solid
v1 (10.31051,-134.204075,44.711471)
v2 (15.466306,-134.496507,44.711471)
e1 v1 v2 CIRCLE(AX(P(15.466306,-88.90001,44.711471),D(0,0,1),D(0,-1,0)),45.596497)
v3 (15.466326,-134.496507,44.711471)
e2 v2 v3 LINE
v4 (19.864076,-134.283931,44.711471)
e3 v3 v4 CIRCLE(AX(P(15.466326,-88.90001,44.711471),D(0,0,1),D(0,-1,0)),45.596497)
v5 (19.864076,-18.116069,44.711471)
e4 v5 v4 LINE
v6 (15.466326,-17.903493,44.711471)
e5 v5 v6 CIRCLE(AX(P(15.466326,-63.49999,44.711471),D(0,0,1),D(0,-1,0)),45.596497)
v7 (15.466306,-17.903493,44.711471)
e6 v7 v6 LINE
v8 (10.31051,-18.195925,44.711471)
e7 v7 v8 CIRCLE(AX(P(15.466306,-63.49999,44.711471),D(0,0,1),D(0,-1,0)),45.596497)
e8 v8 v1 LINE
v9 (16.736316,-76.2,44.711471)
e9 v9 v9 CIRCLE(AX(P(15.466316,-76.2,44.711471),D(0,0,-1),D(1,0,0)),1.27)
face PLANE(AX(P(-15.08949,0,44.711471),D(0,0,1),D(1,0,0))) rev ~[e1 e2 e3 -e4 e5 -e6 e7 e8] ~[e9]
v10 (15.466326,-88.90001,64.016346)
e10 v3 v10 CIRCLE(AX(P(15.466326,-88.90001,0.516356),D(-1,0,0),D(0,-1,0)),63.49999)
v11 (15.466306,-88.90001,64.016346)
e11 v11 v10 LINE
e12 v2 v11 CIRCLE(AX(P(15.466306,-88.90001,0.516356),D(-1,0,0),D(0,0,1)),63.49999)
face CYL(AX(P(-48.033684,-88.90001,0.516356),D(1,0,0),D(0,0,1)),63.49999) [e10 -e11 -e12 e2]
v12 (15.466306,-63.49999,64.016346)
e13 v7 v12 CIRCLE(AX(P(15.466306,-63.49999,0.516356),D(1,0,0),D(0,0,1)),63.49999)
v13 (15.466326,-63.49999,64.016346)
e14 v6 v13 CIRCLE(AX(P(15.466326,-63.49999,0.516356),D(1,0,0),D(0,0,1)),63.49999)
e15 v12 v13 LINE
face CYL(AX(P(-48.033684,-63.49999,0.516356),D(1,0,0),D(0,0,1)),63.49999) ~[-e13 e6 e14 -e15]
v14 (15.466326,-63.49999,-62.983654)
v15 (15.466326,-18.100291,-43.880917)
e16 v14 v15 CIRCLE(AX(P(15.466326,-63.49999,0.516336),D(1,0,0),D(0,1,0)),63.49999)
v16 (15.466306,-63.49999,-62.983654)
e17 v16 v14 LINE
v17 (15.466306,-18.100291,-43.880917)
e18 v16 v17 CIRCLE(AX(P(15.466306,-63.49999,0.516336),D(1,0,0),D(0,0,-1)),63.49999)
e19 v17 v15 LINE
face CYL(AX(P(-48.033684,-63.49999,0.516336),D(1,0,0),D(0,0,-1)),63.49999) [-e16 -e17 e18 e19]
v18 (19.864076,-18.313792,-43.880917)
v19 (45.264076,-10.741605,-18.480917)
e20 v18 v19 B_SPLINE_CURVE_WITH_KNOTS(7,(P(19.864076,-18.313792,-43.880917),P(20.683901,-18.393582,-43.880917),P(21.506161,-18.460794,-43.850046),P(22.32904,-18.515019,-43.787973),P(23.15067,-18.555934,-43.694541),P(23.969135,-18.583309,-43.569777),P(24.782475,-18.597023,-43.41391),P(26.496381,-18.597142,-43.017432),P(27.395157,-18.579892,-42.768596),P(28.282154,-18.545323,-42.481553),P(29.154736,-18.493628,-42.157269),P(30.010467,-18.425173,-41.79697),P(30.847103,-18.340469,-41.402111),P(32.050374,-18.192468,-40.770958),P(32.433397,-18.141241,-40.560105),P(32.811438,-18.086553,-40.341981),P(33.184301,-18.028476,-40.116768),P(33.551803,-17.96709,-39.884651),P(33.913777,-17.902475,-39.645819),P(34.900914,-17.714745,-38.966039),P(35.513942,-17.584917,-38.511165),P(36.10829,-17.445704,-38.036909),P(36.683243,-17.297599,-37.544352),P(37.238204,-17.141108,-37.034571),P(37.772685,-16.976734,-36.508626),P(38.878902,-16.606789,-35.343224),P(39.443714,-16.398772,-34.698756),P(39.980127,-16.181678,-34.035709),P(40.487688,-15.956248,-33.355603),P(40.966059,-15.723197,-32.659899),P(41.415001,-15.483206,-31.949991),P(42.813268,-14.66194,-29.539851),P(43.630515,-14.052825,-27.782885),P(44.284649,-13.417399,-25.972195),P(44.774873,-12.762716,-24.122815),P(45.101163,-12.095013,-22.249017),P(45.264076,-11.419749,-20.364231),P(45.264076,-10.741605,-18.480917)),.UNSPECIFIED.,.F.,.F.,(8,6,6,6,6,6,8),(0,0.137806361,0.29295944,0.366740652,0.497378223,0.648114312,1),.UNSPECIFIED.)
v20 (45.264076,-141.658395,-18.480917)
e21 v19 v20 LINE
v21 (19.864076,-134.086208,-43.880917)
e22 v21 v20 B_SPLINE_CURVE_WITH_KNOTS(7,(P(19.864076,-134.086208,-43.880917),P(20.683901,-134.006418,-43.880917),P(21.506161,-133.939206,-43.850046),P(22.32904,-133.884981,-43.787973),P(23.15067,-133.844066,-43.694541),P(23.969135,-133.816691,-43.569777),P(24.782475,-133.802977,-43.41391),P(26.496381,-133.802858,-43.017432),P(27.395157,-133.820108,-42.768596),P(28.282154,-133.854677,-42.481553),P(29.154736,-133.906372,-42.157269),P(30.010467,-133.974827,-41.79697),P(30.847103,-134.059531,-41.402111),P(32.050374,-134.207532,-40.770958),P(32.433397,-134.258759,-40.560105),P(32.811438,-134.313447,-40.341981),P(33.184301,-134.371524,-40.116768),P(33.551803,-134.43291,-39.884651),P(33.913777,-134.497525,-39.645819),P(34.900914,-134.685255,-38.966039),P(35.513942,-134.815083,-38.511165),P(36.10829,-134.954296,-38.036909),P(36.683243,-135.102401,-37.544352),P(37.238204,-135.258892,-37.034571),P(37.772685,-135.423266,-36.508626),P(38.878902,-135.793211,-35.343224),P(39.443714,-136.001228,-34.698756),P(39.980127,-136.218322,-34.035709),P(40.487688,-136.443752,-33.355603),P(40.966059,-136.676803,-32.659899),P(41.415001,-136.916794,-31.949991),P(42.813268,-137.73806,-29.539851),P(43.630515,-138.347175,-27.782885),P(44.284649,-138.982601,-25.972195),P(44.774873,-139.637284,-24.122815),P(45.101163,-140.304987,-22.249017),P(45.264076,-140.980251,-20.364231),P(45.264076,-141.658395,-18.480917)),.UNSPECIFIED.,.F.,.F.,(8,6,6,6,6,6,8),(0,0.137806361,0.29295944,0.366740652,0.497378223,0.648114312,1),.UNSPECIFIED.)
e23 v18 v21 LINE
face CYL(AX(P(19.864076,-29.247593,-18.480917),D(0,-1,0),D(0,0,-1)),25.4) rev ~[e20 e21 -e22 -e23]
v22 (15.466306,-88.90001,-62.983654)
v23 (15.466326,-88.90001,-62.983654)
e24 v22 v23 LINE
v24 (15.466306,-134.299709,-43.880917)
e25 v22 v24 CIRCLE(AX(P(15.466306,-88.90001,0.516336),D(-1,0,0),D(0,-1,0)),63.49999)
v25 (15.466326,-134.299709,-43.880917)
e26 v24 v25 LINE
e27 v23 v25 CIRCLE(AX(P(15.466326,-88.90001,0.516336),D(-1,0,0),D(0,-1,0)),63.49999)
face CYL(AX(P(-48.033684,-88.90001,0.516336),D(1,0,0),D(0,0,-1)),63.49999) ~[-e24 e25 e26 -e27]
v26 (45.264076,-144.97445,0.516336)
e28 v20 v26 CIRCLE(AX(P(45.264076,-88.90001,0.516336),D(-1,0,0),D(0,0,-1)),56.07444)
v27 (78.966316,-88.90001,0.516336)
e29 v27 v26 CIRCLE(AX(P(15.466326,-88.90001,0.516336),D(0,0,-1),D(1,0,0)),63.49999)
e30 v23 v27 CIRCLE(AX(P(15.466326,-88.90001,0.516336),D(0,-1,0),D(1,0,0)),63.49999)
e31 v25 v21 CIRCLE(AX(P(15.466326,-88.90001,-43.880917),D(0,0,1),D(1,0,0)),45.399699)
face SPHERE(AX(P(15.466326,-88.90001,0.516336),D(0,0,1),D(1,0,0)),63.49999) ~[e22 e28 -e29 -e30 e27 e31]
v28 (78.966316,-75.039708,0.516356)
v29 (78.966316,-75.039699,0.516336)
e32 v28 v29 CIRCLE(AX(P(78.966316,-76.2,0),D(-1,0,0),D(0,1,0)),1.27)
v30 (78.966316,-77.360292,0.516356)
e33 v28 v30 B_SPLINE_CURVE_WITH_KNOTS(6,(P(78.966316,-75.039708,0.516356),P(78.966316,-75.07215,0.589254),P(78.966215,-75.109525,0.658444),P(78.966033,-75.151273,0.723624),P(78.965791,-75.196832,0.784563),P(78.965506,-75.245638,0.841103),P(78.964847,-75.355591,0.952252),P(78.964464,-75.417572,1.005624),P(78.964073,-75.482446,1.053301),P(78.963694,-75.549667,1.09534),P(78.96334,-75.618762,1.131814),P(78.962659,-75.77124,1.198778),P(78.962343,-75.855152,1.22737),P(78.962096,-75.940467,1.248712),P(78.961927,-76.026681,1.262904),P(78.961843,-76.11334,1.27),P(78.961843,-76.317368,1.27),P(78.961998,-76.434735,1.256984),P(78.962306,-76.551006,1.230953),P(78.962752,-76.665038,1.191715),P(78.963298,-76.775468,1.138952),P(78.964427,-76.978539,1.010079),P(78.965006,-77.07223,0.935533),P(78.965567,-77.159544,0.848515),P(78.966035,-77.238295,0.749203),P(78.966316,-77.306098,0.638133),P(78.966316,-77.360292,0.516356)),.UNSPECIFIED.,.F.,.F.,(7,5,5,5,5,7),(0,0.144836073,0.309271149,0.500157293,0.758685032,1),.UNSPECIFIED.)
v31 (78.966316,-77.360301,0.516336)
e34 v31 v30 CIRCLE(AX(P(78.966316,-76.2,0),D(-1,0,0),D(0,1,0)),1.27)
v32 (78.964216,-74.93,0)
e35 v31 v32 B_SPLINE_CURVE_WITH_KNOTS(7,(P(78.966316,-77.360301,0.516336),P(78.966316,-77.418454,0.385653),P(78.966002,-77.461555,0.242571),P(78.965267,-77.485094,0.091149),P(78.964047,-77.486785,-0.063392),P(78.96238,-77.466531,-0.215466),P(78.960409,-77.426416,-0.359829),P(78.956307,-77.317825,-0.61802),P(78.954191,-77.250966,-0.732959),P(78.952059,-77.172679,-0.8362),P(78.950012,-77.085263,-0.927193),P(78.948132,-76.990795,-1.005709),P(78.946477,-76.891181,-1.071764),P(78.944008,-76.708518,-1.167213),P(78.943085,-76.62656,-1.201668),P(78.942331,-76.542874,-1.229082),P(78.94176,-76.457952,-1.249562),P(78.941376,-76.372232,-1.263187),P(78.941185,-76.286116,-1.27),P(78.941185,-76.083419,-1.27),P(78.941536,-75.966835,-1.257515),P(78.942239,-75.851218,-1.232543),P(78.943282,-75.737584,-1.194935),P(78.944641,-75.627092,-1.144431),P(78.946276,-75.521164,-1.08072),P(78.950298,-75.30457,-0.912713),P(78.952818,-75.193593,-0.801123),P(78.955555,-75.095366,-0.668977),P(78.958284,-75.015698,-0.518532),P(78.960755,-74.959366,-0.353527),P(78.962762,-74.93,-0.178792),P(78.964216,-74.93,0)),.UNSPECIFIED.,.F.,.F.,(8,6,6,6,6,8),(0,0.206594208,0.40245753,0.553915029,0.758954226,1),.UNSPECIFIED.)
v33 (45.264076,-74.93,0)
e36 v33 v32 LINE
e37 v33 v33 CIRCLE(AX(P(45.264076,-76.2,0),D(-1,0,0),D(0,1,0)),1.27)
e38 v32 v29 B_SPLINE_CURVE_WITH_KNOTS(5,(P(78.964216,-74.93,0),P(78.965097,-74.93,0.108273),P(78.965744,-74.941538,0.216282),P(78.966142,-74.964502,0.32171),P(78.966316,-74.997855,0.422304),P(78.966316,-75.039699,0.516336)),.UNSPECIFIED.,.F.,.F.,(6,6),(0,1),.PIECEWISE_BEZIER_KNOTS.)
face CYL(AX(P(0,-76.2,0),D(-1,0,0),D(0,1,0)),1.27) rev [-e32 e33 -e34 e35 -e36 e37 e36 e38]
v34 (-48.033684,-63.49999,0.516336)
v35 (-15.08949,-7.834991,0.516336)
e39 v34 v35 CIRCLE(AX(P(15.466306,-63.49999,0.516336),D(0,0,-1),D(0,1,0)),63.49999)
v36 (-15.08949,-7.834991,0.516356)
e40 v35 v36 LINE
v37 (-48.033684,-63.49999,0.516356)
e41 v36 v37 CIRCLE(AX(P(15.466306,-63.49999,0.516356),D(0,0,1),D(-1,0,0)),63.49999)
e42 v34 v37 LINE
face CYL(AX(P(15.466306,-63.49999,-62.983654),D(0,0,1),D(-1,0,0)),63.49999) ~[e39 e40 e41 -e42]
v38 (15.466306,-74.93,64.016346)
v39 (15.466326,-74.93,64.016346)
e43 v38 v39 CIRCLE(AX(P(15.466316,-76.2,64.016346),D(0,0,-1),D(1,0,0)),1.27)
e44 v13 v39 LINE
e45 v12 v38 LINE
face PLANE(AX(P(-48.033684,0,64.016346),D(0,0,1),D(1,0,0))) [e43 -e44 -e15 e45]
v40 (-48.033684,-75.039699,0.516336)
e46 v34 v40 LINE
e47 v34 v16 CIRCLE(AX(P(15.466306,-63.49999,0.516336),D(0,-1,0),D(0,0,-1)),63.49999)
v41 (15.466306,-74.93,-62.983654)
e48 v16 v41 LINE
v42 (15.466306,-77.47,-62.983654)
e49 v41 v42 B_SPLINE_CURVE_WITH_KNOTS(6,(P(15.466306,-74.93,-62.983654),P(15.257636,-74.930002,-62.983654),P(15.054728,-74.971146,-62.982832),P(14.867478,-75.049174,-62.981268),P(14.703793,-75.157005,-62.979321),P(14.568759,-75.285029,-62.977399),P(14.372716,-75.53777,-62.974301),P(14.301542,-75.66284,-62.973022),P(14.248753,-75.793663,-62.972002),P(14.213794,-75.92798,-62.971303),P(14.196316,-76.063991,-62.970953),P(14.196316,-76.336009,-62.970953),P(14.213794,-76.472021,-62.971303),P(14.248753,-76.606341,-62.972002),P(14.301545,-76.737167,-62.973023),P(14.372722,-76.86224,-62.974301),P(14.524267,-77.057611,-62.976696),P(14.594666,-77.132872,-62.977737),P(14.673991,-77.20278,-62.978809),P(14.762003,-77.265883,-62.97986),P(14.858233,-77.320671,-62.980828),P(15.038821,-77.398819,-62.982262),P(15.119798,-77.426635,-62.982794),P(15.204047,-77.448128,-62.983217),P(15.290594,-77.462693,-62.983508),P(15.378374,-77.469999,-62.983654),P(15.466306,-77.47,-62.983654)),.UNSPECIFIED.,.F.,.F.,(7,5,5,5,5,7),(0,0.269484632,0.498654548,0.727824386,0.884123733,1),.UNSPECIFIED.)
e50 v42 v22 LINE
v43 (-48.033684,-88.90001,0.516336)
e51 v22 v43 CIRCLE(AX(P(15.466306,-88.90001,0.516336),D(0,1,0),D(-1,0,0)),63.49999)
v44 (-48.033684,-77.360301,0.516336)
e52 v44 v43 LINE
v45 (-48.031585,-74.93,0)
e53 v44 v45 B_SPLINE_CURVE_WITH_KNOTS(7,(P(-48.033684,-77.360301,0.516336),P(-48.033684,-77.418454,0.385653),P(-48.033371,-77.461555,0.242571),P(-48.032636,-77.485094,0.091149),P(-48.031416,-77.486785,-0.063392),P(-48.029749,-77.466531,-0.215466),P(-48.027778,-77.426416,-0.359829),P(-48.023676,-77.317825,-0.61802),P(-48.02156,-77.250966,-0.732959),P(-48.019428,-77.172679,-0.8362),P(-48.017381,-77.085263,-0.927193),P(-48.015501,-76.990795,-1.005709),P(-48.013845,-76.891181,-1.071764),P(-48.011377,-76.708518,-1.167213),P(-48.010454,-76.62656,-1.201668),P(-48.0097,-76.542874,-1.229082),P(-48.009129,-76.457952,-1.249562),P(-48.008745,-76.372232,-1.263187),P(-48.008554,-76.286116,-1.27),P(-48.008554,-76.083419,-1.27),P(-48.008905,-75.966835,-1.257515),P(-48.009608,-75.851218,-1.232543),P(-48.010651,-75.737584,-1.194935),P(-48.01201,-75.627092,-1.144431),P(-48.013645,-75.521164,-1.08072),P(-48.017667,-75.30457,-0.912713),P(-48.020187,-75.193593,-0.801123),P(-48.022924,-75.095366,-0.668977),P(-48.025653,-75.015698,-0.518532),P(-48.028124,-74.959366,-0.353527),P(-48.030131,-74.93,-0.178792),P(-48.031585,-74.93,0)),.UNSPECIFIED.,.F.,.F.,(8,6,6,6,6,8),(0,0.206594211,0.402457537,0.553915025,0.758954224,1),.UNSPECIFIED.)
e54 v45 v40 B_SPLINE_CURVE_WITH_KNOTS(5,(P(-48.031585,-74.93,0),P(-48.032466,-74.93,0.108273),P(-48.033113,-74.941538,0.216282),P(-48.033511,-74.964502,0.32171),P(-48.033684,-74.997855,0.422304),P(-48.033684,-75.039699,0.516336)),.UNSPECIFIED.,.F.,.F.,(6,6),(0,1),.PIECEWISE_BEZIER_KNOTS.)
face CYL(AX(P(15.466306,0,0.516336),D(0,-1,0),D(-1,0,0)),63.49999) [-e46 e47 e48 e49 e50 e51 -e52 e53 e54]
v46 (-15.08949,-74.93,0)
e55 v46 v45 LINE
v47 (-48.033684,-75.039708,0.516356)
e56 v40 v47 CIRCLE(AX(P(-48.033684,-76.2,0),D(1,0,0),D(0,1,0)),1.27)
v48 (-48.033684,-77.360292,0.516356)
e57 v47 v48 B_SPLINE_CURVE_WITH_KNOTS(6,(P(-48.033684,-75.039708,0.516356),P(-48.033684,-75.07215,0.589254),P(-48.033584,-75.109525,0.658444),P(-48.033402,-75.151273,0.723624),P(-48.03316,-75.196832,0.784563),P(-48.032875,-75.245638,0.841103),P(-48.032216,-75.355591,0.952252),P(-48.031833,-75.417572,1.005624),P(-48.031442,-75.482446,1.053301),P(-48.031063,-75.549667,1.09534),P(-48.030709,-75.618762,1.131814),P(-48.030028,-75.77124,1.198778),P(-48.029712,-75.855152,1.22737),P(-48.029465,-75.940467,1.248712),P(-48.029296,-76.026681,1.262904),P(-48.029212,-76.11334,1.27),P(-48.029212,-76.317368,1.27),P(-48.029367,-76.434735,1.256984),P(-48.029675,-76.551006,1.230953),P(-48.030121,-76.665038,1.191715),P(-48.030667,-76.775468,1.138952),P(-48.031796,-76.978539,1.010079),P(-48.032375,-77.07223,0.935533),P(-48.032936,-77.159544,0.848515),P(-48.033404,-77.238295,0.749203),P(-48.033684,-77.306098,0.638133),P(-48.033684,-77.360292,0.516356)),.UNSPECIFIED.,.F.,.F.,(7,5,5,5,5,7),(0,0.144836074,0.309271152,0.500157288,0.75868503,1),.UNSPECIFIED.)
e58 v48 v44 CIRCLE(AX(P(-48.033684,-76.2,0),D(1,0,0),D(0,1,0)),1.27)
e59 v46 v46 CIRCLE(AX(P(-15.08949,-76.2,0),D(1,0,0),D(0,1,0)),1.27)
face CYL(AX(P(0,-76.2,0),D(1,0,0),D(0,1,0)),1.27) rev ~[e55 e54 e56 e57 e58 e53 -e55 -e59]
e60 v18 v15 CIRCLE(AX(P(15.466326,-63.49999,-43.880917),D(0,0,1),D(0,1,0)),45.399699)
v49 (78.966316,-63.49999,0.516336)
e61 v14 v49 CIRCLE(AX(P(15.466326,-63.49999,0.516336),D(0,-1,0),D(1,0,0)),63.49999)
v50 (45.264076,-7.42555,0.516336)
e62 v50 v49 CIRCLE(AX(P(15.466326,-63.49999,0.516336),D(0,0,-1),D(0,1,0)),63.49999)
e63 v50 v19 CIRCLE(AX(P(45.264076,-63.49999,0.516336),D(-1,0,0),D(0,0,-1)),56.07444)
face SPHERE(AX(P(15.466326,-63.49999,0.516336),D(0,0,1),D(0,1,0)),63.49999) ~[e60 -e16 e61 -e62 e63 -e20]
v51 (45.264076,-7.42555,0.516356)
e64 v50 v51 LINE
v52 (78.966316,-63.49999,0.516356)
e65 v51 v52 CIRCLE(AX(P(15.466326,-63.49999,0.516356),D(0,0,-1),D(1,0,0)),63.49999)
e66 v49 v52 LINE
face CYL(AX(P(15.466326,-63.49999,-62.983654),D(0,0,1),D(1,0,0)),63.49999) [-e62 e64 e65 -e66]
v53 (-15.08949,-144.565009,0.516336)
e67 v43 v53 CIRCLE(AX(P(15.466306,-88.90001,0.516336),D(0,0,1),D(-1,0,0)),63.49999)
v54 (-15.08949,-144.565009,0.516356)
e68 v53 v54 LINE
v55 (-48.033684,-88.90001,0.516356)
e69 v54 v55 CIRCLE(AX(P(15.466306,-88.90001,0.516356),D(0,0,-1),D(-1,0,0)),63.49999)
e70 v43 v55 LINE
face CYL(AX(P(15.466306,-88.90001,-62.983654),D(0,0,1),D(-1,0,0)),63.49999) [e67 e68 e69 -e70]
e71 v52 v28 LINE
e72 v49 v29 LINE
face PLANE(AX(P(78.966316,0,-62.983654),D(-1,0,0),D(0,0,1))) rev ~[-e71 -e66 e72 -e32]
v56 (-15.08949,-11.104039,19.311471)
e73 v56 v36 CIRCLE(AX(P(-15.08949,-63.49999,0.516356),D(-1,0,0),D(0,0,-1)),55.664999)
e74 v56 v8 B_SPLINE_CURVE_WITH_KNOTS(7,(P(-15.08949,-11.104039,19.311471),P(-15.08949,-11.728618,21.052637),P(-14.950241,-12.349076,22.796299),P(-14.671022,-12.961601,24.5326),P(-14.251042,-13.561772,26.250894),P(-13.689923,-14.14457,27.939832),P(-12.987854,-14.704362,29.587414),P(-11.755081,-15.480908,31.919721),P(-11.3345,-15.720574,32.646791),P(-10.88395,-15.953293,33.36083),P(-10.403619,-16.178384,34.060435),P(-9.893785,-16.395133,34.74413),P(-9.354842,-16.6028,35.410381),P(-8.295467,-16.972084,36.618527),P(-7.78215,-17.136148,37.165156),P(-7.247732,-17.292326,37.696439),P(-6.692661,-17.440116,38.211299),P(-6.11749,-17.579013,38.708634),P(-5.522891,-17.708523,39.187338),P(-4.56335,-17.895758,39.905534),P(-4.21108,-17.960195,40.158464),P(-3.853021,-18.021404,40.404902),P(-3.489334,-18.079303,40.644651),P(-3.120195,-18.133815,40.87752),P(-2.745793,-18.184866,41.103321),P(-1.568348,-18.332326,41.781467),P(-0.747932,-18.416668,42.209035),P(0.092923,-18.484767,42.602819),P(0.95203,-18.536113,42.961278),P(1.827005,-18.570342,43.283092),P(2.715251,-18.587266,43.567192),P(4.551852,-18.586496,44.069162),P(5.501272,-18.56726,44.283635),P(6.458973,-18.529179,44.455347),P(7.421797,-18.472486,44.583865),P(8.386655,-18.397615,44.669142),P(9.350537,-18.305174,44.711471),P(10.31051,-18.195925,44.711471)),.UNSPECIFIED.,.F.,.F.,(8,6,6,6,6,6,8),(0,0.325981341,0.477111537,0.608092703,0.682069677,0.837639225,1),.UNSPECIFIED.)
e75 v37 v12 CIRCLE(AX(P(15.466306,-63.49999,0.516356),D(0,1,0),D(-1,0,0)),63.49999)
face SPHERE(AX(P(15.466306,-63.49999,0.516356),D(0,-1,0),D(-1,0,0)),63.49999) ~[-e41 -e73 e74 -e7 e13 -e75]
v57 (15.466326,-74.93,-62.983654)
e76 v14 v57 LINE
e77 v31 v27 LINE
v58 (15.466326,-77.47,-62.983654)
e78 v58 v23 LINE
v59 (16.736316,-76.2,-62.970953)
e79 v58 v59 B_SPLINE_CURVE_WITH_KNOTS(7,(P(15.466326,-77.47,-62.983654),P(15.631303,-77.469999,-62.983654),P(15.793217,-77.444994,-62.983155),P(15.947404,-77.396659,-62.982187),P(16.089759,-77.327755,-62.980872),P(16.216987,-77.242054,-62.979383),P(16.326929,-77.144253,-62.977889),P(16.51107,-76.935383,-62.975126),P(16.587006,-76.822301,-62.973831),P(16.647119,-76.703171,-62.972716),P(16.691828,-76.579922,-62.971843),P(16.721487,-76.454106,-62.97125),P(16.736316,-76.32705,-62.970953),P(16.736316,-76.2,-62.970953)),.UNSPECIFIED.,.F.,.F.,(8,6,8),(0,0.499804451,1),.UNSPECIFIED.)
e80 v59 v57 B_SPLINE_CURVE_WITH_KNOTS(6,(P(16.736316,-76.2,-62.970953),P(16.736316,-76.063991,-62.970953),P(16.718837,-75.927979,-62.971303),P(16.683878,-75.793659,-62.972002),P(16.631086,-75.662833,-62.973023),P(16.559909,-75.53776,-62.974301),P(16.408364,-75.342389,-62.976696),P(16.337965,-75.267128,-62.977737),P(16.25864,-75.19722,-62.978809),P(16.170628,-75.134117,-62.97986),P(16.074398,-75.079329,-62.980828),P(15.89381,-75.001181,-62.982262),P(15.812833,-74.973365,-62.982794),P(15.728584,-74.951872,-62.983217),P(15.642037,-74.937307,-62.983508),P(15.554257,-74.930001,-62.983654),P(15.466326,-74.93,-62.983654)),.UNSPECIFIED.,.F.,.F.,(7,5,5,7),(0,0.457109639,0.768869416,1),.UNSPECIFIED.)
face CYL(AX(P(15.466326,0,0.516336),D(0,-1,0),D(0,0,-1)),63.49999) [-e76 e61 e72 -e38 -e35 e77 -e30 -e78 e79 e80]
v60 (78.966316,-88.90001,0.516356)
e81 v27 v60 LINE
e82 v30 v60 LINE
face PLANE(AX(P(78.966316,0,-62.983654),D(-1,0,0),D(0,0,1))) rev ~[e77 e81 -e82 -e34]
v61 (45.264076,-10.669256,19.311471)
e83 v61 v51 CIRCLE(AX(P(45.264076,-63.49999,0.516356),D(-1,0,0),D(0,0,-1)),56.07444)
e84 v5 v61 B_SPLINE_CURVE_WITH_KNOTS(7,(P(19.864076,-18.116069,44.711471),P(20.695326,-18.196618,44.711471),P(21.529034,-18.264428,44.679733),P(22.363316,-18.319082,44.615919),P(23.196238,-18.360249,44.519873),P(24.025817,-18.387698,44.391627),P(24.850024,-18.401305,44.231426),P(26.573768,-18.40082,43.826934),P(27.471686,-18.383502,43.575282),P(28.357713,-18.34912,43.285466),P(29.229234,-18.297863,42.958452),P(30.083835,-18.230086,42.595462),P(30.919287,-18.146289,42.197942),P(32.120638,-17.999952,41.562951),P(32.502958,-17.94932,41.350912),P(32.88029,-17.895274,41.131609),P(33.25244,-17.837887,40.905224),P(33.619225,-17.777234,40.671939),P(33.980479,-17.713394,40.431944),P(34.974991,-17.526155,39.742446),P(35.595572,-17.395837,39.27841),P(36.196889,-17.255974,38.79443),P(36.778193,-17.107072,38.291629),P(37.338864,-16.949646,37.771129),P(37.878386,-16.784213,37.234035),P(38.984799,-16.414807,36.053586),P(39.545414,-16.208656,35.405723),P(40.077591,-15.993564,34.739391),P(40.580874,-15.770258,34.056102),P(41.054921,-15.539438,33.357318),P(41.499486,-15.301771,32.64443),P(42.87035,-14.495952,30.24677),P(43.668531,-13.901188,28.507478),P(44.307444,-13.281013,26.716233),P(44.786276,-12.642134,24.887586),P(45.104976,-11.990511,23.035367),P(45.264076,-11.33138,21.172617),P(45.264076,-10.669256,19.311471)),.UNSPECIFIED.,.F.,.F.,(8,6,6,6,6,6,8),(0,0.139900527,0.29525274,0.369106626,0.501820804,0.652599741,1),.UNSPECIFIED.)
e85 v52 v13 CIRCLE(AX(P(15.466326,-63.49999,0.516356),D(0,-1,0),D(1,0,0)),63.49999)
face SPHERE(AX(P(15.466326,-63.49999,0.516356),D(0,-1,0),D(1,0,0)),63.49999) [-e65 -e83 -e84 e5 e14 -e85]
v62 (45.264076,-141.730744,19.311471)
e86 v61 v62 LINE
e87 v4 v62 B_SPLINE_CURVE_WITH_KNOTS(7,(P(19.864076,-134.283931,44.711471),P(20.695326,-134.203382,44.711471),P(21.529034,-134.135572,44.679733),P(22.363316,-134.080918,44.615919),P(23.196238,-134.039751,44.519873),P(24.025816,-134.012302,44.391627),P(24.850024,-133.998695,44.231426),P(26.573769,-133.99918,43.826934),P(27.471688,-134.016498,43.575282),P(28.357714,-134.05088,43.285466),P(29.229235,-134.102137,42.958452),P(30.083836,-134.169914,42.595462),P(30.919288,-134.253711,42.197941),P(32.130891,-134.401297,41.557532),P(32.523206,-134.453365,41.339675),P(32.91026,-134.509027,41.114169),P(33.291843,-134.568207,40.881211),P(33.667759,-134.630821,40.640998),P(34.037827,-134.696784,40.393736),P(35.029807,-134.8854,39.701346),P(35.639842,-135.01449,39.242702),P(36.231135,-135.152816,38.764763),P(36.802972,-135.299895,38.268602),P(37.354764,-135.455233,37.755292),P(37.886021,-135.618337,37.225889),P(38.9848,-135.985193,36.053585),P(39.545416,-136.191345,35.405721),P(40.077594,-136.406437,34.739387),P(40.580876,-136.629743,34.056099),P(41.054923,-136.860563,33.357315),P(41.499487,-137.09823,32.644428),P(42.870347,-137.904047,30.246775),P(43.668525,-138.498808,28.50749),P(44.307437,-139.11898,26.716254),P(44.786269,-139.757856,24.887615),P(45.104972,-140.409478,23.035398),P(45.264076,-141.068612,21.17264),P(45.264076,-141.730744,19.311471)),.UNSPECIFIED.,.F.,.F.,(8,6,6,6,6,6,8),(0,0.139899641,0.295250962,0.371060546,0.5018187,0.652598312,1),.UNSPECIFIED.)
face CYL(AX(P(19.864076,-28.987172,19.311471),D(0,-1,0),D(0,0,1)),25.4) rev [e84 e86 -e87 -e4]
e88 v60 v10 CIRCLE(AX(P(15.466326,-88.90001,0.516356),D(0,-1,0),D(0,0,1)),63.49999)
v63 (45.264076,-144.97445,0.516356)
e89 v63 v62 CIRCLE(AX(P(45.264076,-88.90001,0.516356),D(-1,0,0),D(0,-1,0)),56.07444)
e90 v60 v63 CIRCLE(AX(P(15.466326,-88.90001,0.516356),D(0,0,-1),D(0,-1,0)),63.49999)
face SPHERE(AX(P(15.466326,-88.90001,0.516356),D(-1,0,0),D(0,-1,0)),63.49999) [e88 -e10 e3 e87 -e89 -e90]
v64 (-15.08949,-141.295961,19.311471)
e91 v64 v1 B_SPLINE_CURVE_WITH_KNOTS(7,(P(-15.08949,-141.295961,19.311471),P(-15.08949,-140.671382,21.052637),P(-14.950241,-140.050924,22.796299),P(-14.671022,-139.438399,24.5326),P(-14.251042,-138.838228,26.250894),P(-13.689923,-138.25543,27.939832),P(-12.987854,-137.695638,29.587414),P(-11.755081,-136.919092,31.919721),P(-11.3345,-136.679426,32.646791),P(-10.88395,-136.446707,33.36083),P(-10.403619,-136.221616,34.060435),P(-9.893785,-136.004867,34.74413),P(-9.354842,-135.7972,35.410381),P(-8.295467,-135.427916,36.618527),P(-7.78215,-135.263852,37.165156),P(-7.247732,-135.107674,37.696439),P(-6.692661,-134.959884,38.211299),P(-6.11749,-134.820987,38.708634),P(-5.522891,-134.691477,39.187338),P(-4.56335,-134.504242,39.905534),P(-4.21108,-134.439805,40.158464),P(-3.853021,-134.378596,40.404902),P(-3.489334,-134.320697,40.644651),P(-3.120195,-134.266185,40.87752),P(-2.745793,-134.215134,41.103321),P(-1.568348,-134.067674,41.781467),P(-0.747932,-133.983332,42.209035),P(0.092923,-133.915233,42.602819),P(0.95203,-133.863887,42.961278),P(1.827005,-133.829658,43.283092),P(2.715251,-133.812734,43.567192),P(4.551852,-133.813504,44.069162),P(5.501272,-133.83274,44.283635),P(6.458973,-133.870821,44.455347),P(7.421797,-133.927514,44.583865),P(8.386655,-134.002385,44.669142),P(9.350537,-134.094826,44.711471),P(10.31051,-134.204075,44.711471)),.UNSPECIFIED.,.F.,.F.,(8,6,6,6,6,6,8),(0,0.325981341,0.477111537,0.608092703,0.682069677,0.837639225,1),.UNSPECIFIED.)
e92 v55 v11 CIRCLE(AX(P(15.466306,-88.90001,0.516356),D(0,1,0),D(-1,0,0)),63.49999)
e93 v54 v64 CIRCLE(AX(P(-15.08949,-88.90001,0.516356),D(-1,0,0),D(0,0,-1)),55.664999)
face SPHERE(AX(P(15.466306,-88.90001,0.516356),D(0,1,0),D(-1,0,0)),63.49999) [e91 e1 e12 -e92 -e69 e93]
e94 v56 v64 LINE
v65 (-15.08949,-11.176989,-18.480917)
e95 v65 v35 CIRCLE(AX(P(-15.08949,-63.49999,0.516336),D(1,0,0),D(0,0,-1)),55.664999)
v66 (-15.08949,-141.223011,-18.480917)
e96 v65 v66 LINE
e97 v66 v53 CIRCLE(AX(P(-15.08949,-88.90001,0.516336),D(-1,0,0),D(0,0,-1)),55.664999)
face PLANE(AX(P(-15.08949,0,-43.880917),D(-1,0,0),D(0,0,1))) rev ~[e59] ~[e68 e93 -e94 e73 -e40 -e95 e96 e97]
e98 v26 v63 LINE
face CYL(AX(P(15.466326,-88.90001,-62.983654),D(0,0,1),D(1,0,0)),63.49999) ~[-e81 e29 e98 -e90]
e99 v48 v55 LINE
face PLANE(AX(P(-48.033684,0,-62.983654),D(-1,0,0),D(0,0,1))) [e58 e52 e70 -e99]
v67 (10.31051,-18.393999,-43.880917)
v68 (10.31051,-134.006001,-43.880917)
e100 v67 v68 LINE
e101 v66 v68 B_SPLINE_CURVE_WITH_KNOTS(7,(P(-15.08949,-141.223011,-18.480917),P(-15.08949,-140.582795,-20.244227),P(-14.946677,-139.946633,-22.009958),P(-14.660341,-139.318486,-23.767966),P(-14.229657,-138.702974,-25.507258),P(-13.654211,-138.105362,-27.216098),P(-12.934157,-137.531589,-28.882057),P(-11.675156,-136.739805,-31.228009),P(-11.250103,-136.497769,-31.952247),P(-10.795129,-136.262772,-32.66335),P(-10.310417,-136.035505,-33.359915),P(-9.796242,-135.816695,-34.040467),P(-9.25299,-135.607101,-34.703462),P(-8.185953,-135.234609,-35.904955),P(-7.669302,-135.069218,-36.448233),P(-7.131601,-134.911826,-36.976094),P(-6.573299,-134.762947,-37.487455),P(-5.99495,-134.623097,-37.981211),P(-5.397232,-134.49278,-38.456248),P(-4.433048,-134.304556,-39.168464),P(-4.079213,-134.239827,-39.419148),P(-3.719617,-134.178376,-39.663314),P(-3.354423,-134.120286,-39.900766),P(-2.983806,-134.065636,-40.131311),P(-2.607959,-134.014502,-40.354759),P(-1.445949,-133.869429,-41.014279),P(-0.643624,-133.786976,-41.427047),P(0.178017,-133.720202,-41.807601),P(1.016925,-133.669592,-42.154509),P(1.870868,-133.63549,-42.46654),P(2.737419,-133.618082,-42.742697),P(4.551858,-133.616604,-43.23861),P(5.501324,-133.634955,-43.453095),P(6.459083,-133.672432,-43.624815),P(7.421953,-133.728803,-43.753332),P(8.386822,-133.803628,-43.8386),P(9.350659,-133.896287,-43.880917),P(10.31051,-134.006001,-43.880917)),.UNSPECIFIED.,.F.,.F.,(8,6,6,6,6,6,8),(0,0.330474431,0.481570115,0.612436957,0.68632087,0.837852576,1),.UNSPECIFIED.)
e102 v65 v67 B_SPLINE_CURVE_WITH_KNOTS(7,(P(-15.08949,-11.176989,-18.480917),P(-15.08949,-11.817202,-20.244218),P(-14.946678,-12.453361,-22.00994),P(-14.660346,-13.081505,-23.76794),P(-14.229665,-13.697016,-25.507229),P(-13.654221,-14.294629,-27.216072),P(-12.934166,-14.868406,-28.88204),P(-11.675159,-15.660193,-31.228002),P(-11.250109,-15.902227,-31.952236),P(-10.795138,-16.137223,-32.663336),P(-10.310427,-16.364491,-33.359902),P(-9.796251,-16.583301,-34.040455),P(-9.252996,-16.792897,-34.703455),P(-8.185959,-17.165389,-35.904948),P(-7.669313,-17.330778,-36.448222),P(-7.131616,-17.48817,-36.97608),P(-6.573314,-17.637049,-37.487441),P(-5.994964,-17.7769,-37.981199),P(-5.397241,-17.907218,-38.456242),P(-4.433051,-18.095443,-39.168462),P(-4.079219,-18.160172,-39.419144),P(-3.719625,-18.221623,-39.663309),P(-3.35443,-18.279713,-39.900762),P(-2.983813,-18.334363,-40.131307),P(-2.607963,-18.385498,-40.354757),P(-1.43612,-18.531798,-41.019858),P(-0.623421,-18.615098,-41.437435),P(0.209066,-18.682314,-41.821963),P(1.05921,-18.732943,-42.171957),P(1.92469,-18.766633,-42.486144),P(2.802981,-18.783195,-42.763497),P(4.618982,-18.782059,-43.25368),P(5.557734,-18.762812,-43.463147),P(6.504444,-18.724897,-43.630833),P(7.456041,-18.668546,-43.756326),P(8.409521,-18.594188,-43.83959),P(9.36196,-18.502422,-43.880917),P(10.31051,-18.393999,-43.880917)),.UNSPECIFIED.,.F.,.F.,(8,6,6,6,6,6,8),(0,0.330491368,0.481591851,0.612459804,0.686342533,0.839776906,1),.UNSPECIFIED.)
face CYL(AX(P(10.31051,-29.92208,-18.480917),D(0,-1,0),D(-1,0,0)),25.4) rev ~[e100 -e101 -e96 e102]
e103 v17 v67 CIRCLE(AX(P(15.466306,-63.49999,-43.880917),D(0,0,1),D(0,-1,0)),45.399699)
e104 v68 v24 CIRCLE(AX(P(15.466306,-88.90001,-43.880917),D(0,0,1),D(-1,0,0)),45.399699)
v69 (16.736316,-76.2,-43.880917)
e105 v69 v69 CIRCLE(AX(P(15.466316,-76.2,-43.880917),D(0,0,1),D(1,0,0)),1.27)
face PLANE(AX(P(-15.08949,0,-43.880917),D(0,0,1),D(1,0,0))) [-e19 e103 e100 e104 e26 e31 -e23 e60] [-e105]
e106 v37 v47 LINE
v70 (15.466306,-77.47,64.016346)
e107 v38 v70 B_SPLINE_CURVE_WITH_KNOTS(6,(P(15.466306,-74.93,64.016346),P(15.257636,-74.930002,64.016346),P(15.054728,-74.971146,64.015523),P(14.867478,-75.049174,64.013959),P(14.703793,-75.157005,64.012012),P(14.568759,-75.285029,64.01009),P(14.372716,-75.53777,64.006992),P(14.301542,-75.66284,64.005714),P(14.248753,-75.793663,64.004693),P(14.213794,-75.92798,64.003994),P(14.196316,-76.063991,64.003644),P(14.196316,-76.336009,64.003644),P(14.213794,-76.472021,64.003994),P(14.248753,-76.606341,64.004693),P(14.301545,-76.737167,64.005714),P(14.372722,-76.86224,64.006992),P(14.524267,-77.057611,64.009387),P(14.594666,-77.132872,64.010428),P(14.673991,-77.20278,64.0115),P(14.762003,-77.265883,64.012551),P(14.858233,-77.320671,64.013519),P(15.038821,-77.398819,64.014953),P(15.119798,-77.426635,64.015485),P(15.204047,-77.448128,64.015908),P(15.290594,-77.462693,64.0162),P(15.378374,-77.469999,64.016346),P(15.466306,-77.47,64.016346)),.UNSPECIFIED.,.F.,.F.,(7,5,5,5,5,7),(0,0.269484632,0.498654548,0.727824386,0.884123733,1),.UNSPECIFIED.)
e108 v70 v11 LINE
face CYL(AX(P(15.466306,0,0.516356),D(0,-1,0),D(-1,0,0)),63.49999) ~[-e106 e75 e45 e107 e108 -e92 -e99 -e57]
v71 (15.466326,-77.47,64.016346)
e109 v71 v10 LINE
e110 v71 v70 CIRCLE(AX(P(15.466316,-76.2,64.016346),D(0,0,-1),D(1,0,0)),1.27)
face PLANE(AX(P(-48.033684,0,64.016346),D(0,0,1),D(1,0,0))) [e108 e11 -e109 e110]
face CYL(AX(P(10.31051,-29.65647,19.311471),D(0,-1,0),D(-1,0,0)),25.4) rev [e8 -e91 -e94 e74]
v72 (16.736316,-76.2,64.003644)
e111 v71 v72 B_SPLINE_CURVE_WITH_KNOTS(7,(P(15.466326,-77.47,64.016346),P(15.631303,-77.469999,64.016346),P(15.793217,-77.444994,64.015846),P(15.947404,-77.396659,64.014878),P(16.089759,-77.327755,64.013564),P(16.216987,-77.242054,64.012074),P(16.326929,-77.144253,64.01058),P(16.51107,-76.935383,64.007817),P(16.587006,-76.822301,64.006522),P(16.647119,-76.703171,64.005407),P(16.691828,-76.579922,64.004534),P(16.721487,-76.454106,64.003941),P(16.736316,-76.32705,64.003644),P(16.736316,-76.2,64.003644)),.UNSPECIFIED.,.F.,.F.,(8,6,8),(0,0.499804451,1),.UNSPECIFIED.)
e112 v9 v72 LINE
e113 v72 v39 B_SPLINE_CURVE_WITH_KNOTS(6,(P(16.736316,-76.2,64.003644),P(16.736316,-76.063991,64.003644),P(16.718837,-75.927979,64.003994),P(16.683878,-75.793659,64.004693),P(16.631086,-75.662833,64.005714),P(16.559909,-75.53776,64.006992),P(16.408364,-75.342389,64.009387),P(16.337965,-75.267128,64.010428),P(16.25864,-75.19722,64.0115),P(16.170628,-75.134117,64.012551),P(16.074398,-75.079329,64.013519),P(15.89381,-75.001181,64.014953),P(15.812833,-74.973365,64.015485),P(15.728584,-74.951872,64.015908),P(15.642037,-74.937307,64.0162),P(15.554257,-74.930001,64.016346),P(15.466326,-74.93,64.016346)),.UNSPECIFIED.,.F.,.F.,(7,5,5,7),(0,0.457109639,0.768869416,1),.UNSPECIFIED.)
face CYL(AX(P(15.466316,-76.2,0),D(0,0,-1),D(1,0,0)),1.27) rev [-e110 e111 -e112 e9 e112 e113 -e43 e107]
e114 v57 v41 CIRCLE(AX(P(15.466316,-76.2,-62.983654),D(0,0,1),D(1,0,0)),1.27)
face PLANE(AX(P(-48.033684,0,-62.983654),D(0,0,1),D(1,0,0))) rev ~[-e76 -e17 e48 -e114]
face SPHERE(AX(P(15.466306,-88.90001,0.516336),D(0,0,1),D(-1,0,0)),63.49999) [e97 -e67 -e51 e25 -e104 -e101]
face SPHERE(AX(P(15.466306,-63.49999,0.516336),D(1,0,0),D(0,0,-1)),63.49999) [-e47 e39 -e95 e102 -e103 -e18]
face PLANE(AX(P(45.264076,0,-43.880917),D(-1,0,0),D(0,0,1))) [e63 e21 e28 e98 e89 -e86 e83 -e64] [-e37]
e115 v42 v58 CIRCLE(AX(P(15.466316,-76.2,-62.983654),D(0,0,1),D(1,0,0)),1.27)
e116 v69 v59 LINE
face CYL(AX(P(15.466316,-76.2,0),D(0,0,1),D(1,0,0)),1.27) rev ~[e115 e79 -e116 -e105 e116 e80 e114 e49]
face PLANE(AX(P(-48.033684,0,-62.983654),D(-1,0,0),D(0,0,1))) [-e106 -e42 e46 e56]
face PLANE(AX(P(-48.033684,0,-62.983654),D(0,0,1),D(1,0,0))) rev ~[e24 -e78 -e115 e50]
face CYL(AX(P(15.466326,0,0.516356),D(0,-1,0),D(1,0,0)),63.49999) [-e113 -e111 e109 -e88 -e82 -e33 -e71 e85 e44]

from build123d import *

# Parameters (mm, degrees)
F0_W          = 127
F0_H          = 127
F1_DEPTH      = 152.4
F2_R          = 63.49999
F3_W          = 60.3535668924
F3_H          = 88.5923877358
F4_DEPTH      = 187.706
F5_R          = 25.4
F6_R          = 1.27
F7_DEPTH      = 62.9846544394
F7_DEPTH_BACK = 95.758
F8_R          = 1.27
F9_DEPTH      = 78.9673156079
F9_DEPTH_BACK = 48.0346845921


# Not quite as in the source:
# - a fillet or chamfer is up to 0.001 mm smaller than in the source, because OpenCascade refuses the exact size


with BuildPart() as f1:
    # F0 (on Front) → F1 (new body)
    with BuildSketch(Plane.XZ):
        with Locations((15.4663155079, 0.5163455606)):
            Rectangle(F0_W, F0_H)
    extrude(amount=F1_DEPTH)

    # F2 (radius 63.5 in the source; OpenCascade refuses exactly that, so slightly less here)
    f2_edges = [f1.edges().sort_by_distance(p)[0] for p in [
        (-48.033684, -76.2, 64.016346),
        (-48.033684, -152.4, 0.516346),
        (15.466316, -152.4, 64.016346),
        (78.966316, -152.4, 0.516346),
        (78.966316, -76.2, 64.016346),
        (78.966316, 0, 0.516346),
        (15.466316, 0, -62.983654),
        (78.966316, -76.2, -62.983654),
        (-48.033684, -76.2, -62.983654),
        (-48.033684, 0, 0.516346),
        (15.466316, -152.4, -62.983654),
        (15.466316, 0, 64.016346),
    ]]
    fillet(f2_edges, radius=F2_R)

    # F3 (on Front) → F4 (cut)
    with BuildSketch(Plane.XZ):
        with Locations((15.0872929953, 0.415276736)):
            Rectangle(F3_W, F3_H)
    extrude(amount=F4_DEPTH, mode=Mode.SUBTRACT)

    # F5
    f5_edges = [f1.edges().sort_by_distance(p)[0] for p in [
        (45.264076, -76.2, -43.880917),
        (45.264076, -76.2, 44.711471),
        (-15.08949, -76.2, 44.711471),
        (-15.08949, -76.2, -43.880917),
    ]]
    fillet(f5_edges, radius=F5_R)

    # F6 (on Top) → F7 (cut, two sides)
    with BuildSketch(Plane.XY) as f7_sk:
        with Locations((15.4663155079, -76.2)):
            Circle(F6_R)
    extrude(amount=-F7_DEPTH, mode=Mode.SUBTRACT)
    extrude(f7_sk.sketch, amount=F7_DEPTH_BACK, mode=Mode.SUBTRACT)

    # F8 (on Right) → F9 (cut, two sides)
    with BuildSketch(Plane.YZ) as f9_sk:
        with Locations((-76.2, 0)):
            Circle(F8_R)
    extrude(amount=F9_DEPTH, mode=Mode.SUBTRACT)
    extrude(f9_sk.sketch, amount=-F9_DEPTH_BACK, mode=Mode.SUBTRACT)


solid = f1.part
